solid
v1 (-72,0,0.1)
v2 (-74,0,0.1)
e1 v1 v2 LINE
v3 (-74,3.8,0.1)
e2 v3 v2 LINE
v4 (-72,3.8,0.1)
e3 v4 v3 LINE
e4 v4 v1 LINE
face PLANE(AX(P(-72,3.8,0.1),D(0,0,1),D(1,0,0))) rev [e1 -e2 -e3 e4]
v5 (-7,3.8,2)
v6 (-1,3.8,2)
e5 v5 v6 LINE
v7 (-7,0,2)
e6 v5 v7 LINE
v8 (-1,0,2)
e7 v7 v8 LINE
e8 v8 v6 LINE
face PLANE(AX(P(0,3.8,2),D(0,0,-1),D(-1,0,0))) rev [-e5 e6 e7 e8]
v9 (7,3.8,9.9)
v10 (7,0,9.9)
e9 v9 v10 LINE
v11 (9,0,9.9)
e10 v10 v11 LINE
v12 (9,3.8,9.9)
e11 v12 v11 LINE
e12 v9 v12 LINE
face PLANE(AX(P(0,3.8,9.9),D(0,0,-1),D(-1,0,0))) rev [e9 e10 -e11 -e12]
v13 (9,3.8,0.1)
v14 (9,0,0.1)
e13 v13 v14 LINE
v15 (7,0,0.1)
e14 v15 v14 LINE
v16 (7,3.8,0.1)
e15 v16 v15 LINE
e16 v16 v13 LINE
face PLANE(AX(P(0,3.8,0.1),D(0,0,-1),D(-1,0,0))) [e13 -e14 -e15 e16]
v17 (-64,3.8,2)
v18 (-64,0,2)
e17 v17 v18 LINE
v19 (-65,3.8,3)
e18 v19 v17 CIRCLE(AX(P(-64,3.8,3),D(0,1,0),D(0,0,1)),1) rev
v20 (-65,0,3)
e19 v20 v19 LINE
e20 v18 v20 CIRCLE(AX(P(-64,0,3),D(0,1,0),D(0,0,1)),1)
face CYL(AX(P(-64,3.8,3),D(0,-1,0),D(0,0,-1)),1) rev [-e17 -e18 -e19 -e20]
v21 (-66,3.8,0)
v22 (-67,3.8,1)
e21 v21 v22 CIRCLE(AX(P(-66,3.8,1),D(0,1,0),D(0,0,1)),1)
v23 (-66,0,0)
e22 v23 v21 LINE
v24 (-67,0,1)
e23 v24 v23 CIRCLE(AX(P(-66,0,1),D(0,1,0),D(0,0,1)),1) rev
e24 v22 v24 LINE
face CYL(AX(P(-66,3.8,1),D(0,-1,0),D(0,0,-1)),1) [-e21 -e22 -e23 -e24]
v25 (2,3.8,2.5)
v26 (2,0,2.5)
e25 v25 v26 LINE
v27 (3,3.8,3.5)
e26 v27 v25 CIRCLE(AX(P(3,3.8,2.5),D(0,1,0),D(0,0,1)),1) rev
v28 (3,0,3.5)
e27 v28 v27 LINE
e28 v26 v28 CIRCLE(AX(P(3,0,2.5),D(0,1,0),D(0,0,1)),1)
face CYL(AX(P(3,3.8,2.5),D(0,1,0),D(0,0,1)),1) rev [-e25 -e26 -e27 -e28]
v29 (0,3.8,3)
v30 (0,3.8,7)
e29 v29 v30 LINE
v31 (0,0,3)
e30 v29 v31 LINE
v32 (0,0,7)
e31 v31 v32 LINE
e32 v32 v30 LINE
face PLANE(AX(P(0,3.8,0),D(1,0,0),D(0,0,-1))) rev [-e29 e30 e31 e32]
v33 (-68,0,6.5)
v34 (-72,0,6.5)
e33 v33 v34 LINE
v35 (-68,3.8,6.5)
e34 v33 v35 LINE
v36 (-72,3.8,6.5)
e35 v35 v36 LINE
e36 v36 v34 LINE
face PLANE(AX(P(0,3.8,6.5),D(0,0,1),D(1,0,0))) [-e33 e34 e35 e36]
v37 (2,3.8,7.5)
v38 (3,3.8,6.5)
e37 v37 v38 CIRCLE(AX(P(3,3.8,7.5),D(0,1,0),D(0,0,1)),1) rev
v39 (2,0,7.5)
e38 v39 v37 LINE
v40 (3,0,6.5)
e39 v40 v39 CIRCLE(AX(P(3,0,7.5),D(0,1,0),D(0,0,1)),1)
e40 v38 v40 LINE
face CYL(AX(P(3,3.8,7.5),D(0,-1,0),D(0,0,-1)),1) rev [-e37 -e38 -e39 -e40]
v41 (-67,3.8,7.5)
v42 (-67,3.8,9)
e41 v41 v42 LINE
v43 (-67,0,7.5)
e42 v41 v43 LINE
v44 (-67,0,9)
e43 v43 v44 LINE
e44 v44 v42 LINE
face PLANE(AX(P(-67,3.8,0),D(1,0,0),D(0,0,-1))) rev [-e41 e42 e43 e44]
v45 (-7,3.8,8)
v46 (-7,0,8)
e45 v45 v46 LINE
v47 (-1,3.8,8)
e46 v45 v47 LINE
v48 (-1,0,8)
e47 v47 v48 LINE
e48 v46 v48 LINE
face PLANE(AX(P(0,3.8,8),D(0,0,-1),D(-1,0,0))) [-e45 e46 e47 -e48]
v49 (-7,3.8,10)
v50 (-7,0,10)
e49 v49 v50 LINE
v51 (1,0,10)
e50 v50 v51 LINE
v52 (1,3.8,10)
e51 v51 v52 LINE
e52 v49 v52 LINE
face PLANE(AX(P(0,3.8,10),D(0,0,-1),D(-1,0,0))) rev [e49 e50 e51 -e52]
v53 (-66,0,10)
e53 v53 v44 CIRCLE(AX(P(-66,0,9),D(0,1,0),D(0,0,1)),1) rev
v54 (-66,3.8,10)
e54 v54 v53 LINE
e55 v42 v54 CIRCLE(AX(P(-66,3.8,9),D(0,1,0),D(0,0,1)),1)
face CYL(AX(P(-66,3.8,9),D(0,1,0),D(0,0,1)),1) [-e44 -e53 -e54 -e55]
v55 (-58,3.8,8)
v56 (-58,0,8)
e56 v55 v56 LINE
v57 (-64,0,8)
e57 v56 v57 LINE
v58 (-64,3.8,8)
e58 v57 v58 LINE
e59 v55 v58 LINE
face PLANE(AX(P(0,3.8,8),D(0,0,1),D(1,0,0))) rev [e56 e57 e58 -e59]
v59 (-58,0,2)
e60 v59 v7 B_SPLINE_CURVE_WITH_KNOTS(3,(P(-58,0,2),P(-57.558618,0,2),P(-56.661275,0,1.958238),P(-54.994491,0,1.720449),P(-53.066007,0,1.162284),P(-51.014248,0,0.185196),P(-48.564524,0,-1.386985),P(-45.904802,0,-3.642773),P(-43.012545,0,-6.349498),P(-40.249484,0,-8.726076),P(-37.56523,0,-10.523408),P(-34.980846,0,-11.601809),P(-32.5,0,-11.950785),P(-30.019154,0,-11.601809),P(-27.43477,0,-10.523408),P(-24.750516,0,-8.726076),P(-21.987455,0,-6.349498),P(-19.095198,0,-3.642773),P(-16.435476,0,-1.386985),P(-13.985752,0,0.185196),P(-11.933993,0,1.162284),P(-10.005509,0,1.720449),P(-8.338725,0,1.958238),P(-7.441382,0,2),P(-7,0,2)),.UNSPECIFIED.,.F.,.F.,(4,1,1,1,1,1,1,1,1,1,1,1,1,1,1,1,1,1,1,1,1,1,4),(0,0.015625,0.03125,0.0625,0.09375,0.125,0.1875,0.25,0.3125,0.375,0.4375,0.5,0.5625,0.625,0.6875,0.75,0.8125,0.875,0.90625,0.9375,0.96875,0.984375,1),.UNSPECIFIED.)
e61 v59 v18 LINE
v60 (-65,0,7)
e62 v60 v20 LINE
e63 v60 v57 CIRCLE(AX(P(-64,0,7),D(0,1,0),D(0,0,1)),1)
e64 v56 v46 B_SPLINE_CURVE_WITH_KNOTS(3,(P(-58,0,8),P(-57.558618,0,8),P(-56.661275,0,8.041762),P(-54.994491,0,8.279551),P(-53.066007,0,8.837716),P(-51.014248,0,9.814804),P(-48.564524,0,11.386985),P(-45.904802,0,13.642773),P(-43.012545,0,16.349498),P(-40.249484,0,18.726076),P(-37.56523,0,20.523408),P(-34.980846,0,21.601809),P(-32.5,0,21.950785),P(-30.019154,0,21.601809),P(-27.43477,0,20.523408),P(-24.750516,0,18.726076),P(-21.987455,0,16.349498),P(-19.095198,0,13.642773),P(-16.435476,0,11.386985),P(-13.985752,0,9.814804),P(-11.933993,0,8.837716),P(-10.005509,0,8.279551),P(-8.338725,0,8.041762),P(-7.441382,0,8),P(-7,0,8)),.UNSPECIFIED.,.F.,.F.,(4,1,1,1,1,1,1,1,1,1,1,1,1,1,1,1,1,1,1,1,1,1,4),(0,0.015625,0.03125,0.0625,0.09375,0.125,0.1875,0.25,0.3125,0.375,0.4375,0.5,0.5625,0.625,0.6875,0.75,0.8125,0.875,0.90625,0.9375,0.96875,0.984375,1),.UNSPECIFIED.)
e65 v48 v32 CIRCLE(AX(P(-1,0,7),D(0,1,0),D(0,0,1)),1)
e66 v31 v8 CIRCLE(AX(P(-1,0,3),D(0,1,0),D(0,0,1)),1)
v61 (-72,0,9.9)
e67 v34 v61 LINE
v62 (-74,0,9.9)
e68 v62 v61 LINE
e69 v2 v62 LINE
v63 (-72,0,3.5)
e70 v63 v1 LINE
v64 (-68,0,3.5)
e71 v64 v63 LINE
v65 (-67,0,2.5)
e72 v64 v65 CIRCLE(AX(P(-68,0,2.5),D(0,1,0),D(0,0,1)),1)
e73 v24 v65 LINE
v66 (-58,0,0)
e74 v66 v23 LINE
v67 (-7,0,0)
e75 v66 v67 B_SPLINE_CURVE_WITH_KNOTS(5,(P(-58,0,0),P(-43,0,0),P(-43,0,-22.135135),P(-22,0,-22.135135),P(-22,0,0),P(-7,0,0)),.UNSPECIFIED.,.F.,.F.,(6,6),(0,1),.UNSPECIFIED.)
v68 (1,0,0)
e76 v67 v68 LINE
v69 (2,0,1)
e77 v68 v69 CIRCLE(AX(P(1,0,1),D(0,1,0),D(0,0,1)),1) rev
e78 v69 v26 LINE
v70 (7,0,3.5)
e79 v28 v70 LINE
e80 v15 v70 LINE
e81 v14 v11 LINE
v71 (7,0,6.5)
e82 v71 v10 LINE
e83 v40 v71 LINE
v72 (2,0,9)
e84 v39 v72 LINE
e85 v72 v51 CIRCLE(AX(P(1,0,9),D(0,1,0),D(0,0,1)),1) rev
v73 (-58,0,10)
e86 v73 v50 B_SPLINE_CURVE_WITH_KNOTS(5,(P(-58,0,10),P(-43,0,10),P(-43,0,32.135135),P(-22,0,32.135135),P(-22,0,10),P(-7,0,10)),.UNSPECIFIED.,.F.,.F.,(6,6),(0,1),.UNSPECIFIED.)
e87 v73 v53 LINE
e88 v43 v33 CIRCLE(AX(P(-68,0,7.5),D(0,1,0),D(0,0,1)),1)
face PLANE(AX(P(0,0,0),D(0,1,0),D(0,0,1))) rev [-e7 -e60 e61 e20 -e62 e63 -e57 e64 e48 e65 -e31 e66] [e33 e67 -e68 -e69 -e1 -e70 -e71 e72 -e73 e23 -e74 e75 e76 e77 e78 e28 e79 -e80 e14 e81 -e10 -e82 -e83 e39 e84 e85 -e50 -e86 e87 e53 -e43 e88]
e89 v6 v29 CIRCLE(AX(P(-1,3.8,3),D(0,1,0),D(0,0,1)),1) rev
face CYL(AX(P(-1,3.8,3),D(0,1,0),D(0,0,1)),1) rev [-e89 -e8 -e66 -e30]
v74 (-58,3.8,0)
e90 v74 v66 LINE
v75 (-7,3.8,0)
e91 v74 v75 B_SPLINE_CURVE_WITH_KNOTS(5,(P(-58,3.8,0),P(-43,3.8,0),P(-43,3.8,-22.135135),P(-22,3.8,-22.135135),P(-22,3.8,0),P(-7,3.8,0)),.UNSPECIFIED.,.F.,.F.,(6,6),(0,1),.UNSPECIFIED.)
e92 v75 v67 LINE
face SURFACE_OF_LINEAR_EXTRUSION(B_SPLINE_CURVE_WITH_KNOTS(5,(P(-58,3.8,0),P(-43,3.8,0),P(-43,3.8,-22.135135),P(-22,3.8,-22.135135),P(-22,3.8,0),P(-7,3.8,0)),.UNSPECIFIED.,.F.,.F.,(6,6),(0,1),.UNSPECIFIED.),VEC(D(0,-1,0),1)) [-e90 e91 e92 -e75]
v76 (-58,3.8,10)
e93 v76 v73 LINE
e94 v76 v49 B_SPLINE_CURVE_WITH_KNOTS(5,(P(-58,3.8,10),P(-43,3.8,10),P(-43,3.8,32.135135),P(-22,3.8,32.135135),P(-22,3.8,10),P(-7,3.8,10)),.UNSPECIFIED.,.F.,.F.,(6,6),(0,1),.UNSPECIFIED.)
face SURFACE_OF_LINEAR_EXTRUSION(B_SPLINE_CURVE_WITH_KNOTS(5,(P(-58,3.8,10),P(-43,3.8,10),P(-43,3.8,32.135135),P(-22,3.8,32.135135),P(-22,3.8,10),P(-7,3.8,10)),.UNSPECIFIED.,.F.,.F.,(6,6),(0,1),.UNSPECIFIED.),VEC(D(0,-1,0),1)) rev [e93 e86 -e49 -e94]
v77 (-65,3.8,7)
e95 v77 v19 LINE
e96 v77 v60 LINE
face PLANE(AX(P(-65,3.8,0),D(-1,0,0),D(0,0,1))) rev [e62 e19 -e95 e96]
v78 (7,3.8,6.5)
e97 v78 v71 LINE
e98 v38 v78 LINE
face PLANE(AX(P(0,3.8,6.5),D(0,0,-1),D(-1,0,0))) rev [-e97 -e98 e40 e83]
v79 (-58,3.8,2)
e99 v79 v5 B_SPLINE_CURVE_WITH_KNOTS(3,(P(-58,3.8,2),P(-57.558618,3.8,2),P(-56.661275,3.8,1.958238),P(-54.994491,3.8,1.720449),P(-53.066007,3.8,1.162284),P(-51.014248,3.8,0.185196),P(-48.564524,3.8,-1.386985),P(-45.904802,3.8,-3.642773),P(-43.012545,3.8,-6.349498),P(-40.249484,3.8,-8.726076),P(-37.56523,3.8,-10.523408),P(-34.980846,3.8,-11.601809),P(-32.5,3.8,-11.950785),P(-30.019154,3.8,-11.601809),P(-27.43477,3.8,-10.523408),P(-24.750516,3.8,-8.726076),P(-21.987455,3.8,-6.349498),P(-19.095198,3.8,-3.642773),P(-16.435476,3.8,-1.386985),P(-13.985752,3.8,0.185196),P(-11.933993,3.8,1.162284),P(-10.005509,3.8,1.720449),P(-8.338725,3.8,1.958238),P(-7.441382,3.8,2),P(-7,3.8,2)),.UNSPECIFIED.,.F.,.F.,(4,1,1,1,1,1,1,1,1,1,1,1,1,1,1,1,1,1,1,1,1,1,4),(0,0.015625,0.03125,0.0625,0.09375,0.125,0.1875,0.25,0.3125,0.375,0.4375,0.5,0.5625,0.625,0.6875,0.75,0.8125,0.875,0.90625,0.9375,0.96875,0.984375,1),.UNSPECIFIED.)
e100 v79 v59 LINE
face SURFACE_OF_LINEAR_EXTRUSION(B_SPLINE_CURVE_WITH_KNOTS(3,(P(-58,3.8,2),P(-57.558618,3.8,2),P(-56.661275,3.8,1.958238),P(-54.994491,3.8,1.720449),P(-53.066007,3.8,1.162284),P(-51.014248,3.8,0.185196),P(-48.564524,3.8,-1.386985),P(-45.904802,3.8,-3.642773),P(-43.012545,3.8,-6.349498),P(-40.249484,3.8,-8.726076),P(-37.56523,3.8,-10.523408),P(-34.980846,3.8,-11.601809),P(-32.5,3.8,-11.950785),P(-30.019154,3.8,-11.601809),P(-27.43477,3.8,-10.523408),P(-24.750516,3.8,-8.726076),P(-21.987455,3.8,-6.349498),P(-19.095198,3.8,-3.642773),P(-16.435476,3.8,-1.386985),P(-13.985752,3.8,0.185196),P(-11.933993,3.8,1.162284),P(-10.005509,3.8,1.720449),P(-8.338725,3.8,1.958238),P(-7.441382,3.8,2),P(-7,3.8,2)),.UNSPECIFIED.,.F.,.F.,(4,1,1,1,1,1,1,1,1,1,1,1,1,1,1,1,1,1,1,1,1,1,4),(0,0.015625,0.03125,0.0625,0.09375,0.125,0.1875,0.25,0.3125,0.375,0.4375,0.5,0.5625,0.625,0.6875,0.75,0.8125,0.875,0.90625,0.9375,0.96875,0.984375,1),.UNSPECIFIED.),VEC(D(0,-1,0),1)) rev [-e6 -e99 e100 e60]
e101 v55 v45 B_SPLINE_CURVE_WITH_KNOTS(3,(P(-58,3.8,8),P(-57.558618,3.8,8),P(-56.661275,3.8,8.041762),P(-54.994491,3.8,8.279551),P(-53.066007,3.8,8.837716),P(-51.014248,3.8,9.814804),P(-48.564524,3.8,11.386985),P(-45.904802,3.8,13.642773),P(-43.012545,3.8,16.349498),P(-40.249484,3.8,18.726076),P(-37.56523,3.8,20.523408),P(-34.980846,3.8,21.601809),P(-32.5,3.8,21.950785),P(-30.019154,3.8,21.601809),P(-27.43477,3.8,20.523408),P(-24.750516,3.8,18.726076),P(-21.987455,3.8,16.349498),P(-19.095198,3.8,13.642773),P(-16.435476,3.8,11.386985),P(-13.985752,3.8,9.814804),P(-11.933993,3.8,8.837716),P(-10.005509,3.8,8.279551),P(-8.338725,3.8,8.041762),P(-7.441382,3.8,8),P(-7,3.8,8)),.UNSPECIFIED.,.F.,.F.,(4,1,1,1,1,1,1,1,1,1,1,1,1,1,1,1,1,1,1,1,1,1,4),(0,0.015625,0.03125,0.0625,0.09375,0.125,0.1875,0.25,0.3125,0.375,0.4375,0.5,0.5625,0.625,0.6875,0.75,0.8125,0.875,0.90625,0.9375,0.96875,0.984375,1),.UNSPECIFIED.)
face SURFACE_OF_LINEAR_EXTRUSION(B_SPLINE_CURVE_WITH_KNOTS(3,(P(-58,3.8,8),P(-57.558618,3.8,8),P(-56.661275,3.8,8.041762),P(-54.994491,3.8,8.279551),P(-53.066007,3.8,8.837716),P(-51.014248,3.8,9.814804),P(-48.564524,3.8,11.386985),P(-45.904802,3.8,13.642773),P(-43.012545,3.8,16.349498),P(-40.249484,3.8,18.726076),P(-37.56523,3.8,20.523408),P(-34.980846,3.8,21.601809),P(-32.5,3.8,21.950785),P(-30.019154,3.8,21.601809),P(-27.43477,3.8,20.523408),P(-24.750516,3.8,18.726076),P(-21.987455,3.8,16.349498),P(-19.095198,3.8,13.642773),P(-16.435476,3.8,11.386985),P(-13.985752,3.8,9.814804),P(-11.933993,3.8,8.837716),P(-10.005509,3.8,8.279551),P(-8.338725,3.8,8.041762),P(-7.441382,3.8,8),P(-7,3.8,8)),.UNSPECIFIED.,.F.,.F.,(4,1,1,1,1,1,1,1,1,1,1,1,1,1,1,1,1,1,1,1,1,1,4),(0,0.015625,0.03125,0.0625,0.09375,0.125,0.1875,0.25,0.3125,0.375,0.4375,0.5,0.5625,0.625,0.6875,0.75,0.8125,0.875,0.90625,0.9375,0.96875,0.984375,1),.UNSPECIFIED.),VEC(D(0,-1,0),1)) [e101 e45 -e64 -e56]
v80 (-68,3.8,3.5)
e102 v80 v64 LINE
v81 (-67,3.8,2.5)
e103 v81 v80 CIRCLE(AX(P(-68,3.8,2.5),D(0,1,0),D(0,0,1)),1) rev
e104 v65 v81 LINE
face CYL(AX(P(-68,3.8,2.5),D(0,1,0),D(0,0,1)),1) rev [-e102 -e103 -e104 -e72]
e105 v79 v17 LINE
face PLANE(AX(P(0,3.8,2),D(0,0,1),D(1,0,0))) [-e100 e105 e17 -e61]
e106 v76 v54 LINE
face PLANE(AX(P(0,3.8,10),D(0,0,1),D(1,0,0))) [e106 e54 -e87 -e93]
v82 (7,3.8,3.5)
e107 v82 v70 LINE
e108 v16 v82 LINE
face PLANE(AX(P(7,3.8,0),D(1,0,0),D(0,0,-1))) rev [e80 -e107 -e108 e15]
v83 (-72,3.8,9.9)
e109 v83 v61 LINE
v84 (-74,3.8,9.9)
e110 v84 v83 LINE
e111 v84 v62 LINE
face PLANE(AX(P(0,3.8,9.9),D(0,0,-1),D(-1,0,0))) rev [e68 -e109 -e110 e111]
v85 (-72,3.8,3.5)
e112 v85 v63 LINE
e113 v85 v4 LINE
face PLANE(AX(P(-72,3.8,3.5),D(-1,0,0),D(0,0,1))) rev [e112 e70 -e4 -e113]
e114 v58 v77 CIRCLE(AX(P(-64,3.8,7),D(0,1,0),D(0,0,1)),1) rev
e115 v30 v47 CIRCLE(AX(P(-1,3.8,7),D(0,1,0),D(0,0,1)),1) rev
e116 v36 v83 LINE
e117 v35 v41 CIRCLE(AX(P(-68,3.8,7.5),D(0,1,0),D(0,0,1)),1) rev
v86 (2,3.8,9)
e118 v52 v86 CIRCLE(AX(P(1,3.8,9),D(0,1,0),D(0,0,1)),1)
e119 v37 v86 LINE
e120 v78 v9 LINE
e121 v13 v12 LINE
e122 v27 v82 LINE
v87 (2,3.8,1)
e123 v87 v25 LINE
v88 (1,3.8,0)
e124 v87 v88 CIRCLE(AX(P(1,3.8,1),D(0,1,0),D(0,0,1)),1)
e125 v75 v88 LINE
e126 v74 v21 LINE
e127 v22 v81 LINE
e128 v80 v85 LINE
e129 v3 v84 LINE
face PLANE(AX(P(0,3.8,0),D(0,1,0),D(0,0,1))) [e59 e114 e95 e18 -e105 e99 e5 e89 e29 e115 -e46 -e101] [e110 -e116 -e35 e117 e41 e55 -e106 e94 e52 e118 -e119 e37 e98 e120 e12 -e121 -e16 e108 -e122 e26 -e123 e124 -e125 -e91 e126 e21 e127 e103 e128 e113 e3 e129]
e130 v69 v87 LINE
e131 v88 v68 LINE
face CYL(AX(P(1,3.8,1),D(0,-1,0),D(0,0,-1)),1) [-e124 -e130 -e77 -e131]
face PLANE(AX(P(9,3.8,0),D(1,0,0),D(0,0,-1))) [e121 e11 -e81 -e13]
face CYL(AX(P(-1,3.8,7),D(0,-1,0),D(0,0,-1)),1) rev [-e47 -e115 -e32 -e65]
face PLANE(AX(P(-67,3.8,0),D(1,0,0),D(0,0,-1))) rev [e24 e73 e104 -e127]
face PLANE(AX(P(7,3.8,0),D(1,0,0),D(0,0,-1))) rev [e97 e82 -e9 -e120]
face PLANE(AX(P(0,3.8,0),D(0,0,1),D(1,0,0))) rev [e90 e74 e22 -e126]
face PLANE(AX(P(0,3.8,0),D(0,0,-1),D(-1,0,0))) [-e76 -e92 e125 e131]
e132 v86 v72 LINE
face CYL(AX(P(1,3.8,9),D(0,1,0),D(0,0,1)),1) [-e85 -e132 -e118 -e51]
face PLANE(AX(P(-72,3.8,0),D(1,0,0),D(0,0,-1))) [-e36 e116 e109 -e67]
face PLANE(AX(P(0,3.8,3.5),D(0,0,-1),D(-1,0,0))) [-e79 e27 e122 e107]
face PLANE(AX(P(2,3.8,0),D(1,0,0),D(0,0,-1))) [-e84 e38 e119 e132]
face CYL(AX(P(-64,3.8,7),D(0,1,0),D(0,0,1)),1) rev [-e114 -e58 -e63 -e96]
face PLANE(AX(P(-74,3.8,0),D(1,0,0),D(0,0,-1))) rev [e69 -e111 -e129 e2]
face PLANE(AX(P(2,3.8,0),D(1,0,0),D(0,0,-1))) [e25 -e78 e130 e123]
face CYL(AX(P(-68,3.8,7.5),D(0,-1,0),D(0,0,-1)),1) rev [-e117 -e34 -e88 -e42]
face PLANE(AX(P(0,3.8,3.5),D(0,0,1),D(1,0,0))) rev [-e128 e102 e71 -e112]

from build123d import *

# Parameters (mm, degrees)
BOSS_EXTRUDE1_DEPTH = 3.8
FILLET1_R           = 1
FILLET2_R           = 1


# Read off the part's stored shape, not the designer's step: Boss-Extrude1
with BuildPart() as part:
    # Boss-Extrude1 outline → Boss-Extrude1 (new body)
    with BuildSketch(Plane(origin=(0, 0, 0), x_dir=(1, 0, 0), z_dir=(0, 1, 0))):
        with BuildLine():
            Line((-67, -3.5), (-72, -3.5))
            Line((-72, -3.5), (-72, -0.1))
            Line((-72, -0.1), (-74, -0.1))
            Line((-74, -0.1), (-74, -9.9))
            Line((-74, -9.9), (-72, -9.9))
            Line((-72, -9.9), (-72, -6.5))
            Line((-72, -6.5), (-67, -6.5))
            Line((-67, -6.5), (-67, -10))
            Line((-67, -10), (-58, -10))
            add(Edge.make_bspline(
                [(-58, -10), (-43, -10), (-43, -32.135135135), (-22, -32.135135135), (-22, -10), (-7, -10)],
                knots=[0, 0, 0, 0, 0, 0, 1, 1, 1, 1, 1, 1], degree=5))
            Line((-7, -10), (2, -10))
            Line((2, -10), (2, -6.5))
            Line((2, -6.5), (7, -6.5))
            Line((7, -6.5), (7, -9.9))
            Line((7, -9.9), (9, -9.9))
            Line((9, -9.9), (9, -0.1))
            Line((9, -0.1), (7, -0.1))
            Line((7, -0.1), (7, -3.5))
            Line((7, -3.5), (2, -3.5))
            Line((2, -3.5), (2, 0))
            Line((2, 0), (-7, 0))
            add(Edge.make_bspline(
                [(-58, 0), (-43, 0), (-43, 22.135135135), (-22, 22.135135135), (-22, 0), (-7, 0)],
                knots=[0, 0, 0, 0, 0, 0, 1, 1, 1, 1, 1, 1], degree=5))
            Line((-58, 0), (-67, 0))
            Line((-67, 0), (-67, -3.5))
        make_face()
        with BuildLine():
            Line((-7, -2), (0, -2))
            Line((0, -2), (0, -8))
            Line((0, -8), (-7, -8))
            add(Edge.make_bspline(
                [(-58, -8), (-57.558618283, -8), (-56.661274976, -8.041762499), (-54.994490556, -8.279551492), (-53.066007456, -8.837716096), (-51.014248285, -9.814804326), (-48.564524406, -11.386984706), (-45.904801681, -13.642773041), (-43.012545098, -16.349497976), (-40.249484403, -18.726076341), (-37.565229513, -20.52340788), (-34.980845565, -21.601809204), (-32.5, -21.950784587), (-30.019154435, -21.601809204), (-27.434770487, -20.52340788), (-24.750515597, -18.726076341), (-21.987454902, -16.349497976), (-19.095198319, -13.642773041), (-16.435475594, -11.386984706), (-13.985751715, -9.814804326), (-11.933992544, -8.837716096), (-10.005509444, -8.279551492), (-8.338725024, -8.041762499), (-7.441381717, -8), (-7, -8)],
                knots=[0, 0, 0, 0, 0.015625, 0.03125, 0.0625, 0.09375, 0.125, 0.1875, 0.25, 0.3125, 0.375, 0.4375, 0.5, 0.5625, 0.625, 0.6875, 0.75, 0.8125, 0.875, 0.90625, 0.9375, 0.96875, 0.984375, 1, 1, 1, 1], degree=3))
            Line((-58, -8), (-65, -8))
            Line((-65, -8), (-65, -2))
            Line((-65, -2), (-58, -2))
            add(Edge.make_bspline(
                [(-58, -2), (-57.558618283, -2), (-56.661274976, -1.958237501), (-54.994490556, -1.720448508), (-53.066007456, -1.162283904), (-51.014248285, -0.185195674), (-48.564524406, 1.386984706), (-45.904801681, 3.642773041), (-43.012545098, 6.349497976), (-40.249484403, 8.726076341), (-37.565229513, 10.52340788), (-34.980845565, 11.601809204), (-32.5, 11.950784587), (-30.019154435, 11.601809204), (-27.434770487, 10.52340788), (-24.750515597, 8.726076341), (-21.987454902, 6.349497976), (-19.095198319, 3.642773041), (-16.435475594, 1.386984706), (-13.985751715, -0.185195674), (-11.933992544, -1.162283904), (-10.005509444, -1.720448508), (-8.338725024, -1.958237501), (-7.441381717, -2), (-7, -2)],
                knots=[0, 0, 0, 0, 0.015625, 0.03125, 0.0625, 0.09375, 0.125, 0.1875, 0.25, 0.3125, 0.375, 0.4375, 0.5, 0.5625, 0.625, 0.6875, 0.75, 0.8125, 0.875, 0.90625, 0.9375, 0.96875, 0.984375, 1, 1, 1, 1], degree=3))
        make_face(mode=Mode.SUBTRACT)
    extrude(amount=BOSS_EXTRUDE1_DEPTH)

    # Fillet1
    fillet1_edges = [part.edges().sort_by_distance(p)[0] for p in [
        (-67, 1.9, 3.5),
        (-67, 1.9, 0),
        (2, 1.9, 0),
        (2, 1.9, 3.5),
        (2, 1.9, 6.5),
        (2, 1.9, 10),
        (-67, 1.9, 10),
        (-67, 1.9, 6.5),
    ]]
    fillet(fillet1_edges, radius=FILLET1_R)

    # Fillet2
    fillet2_edges = [part.edges().sort_by_distance(p)[0] for p in [
        (-65, 1.9, 2),
        (-65, 1.9, 8),
        (0, 1.9, 8),
        (0, 1.9, 2),
    ]]
    fillet(fillet2_edges, radius=FILLET2_R)


solid = part.part
